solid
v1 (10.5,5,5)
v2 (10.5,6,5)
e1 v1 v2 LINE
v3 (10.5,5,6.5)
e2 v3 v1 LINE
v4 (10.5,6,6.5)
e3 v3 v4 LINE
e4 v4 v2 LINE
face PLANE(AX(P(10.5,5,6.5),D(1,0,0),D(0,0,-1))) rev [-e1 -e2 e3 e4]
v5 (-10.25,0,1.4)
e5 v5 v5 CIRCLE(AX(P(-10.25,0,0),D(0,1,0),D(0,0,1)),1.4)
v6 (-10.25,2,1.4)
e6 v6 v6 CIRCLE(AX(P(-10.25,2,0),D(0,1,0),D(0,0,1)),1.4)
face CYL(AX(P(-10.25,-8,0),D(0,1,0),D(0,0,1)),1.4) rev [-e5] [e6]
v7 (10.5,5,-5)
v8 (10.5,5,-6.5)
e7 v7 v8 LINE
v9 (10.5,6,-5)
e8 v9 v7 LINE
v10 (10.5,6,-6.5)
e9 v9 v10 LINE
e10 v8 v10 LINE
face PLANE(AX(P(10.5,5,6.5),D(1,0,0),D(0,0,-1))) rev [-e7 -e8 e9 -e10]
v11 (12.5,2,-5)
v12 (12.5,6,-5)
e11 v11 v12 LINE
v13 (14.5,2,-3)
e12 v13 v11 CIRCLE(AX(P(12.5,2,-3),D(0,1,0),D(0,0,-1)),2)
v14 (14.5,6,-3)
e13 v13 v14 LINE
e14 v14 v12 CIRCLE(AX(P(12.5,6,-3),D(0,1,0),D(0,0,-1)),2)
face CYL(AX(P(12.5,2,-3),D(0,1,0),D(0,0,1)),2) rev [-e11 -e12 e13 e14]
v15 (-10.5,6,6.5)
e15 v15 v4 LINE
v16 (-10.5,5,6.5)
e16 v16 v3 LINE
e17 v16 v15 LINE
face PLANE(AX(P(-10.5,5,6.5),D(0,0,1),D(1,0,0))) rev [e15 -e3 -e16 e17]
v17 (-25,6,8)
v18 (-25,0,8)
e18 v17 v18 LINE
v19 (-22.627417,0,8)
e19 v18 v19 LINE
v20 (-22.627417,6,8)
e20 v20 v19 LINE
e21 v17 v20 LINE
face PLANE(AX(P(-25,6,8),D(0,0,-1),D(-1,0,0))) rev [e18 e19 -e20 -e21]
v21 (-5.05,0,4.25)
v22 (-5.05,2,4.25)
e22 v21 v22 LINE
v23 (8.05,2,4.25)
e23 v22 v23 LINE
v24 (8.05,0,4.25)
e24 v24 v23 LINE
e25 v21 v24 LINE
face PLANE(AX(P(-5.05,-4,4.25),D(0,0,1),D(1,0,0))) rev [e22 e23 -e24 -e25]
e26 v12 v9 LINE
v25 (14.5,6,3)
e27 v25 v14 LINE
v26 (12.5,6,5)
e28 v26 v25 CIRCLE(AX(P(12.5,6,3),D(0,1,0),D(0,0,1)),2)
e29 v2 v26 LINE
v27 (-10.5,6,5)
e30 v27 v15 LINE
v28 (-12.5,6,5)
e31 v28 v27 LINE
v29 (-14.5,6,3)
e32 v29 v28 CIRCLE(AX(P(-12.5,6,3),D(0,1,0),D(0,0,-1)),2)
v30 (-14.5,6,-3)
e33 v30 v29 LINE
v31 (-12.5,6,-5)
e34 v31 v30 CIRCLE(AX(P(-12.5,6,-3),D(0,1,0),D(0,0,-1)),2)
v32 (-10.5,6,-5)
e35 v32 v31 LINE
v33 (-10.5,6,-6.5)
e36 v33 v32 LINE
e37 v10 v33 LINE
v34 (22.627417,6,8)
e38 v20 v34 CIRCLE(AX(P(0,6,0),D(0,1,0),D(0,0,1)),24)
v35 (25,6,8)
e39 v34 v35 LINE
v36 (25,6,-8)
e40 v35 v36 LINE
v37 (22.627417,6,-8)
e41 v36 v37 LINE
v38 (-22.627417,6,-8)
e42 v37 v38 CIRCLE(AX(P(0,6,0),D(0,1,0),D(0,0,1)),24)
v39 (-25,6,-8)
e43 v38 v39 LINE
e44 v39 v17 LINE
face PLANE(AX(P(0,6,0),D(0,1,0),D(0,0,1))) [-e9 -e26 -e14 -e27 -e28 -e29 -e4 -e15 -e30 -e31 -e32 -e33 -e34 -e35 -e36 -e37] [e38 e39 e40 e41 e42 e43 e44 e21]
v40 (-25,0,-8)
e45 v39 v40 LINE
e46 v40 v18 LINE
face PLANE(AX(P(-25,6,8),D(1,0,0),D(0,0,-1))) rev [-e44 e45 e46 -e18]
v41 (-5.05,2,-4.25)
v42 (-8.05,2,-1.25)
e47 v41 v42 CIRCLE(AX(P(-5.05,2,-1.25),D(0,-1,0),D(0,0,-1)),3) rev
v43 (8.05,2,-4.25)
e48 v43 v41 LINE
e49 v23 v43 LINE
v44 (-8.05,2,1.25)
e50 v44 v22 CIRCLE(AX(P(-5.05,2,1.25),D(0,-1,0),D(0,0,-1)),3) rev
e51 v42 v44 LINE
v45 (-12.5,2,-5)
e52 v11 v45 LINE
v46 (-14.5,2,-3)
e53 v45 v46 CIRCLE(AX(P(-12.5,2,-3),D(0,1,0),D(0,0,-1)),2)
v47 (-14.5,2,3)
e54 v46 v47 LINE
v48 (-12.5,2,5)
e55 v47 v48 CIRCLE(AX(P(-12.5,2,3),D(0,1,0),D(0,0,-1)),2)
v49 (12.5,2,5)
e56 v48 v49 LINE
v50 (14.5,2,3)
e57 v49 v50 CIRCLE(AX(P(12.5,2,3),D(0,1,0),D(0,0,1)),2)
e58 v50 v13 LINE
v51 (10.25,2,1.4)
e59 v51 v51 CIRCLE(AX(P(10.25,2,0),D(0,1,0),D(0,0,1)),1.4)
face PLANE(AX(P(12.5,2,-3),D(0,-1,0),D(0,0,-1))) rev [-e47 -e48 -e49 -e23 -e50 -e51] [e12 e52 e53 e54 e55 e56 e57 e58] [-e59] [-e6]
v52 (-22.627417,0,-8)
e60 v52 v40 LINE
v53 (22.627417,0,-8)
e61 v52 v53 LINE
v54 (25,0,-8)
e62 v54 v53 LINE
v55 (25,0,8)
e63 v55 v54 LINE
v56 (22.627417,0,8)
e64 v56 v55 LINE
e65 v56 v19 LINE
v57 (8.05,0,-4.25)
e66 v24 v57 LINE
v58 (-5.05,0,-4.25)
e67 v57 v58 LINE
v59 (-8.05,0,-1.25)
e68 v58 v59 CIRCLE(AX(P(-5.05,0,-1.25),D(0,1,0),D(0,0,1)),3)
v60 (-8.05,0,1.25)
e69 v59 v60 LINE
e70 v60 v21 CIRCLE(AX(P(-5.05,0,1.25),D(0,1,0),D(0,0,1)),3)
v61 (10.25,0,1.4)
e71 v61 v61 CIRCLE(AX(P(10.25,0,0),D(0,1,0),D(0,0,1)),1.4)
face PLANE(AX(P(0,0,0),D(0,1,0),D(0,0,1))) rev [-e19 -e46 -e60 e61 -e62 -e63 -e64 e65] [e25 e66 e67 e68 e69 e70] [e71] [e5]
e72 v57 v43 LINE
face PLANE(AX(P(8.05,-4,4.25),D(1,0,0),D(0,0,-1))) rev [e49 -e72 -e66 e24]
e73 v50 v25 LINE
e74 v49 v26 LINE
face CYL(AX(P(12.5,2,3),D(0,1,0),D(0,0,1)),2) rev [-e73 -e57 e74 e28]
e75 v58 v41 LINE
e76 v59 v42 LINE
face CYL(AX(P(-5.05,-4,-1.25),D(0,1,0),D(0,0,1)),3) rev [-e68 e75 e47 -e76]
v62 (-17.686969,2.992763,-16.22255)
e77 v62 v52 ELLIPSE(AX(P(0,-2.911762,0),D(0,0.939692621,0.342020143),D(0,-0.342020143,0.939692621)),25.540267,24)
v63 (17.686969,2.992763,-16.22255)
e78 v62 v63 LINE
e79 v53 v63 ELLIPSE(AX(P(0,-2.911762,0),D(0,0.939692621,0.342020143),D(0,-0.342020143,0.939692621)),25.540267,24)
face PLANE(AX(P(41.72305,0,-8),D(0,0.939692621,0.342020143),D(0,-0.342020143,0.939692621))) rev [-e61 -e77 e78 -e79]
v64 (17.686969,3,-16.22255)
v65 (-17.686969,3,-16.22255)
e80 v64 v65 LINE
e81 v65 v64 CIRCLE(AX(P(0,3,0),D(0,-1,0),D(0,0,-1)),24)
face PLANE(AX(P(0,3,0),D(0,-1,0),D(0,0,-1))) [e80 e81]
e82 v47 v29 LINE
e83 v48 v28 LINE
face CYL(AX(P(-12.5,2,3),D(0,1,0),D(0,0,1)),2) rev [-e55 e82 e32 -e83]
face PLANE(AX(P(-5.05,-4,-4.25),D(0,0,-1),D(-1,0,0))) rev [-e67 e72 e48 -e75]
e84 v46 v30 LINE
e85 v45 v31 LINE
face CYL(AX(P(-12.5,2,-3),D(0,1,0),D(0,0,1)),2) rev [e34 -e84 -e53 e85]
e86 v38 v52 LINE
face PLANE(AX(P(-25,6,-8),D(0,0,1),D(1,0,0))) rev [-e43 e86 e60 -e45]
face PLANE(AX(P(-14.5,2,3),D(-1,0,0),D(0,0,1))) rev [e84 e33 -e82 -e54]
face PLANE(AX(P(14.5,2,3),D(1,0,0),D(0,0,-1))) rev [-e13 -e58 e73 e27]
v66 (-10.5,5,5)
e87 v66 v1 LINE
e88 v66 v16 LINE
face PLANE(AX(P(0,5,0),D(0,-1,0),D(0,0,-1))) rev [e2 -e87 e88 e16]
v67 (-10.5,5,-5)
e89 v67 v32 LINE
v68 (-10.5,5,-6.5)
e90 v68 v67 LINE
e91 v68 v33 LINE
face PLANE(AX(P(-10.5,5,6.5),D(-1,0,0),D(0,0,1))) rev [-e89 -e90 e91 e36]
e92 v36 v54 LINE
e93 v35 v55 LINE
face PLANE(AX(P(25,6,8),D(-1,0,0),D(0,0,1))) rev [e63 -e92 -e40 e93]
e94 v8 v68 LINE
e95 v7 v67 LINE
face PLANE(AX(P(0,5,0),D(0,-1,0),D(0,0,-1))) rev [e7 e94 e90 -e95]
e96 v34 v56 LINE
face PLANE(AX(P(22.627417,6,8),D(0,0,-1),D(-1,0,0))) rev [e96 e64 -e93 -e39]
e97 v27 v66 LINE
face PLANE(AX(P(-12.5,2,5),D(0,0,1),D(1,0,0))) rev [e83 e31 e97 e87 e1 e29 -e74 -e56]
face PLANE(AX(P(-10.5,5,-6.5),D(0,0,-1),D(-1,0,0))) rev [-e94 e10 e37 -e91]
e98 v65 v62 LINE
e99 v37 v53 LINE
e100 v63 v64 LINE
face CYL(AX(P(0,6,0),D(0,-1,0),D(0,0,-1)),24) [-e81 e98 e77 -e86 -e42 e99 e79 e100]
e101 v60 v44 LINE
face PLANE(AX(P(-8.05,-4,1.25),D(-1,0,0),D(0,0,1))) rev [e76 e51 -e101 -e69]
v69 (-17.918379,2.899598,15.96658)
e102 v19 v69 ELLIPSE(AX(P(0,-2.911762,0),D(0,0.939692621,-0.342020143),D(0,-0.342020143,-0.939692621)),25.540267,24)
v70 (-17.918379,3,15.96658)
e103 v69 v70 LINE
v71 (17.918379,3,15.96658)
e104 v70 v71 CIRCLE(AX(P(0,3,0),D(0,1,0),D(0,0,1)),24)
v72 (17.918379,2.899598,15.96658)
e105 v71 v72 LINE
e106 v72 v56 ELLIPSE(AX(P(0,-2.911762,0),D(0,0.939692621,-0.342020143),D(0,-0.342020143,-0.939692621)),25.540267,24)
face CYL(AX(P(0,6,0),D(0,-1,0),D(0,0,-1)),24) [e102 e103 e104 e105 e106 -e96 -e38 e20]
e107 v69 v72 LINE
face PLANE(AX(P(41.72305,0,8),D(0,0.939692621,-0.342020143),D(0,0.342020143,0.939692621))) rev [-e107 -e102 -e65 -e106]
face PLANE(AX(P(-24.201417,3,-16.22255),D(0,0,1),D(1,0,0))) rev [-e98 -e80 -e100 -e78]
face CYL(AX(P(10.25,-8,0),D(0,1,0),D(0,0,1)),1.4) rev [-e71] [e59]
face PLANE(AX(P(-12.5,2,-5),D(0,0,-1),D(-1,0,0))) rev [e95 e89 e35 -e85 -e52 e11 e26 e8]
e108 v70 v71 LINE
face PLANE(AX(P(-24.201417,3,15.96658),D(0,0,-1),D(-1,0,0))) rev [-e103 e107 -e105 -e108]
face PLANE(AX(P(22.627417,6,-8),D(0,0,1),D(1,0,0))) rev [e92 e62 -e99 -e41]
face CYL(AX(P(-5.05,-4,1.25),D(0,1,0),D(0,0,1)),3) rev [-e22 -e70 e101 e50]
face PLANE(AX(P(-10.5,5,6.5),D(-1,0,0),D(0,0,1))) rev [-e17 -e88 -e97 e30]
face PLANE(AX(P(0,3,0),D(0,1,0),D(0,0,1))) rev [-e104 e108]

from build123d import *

# Parameters (mm, degrees)
BOSS_EXTRUDE1_DEPTH = 6
CUT_EXTRUDE1_DEPTH  = 10
CUT_EXTRUDE2_DEPTH  = 4
SKETCH4_W           = 21
SKETCH4_H           = 13
CUT_EXTRUDE3_DEPTH  = 1
SKETCH5_R           = 1.4
CUT_EXTRUDE4_DEPTH  = 10
CUT_EXTRUDE8_START  = -22.627416998
CUT_EXTRUDE8_DEPTH  = 45.254833996
SKETCH8_W           = 50.670468249
SKETCH8_H           = 10.499687698
SKETCH8_W_2         = 48.947034964
SKETCH8_H_2         = 10.380689976
CUT_EXTRUDE9_DEPTH  = 3


# Read off the part's stored shape, not the designer's step: Cut-Extrude8
with BuildPart() as part:
    # Sketch1 → Boss-Extrude1 (new body)
    with BuildSketch(Plane(origin=(0, 0, 0), x_dir=(1, 0, 0), z_dir=(0, 1, 0))):
        with BuildLine():
            Line((22.627416998, 8), (25, 8))
            Line((25, 8), (25, -8))
            Line((25, -8), (22.627416998, -8))
            ThreePointArc((22.627416998, -8), (0, -24), (-22.627416998, -8))
            Line((-22.627416998, -8), (-25, -8))
            Line((-25, -8), (-25, 8))
            Line((-25, 8), (-22.627416998, 8))
            ThreePointArc((-22.627416998, 8), (0, 24), (22.627416998, 8))
        make_face()
    extrude(amount=BOSS_EXTRUDE1_DEPTH)

    # Sketch2 → Cut-Extrude1 (cut)
    with BuildSketch(Plane(origin=(0, 6, 0), x_dir=(1, 0, 0), z_dir=(0, 1, 0))):
        with BuildLine():
            Line((-5.05, -4.25), (8.05, -4.25))
            Line((8.05, -4.25), (8.05, 4.25))
            Line((8.05, 4.25), (-5.05, 4.25))
            ThreePointArc((-5.05, 4.25), (-7.171320344, 3.371320344), (-8.05, 1.25))
            Line((-8.05, 1.25), (-8.05, -1.25))
            ThreePointArc((-8.05, -1.25), (-7.171320344, -3.371320344), (-5.05, -4.25))
        make_face()
    extrude(amount=-CUT_EXTRUDE1_DEPTH, mode=Mode.SUBTRACT)

    # Sketch3 → Cut-Extrude2 (cut)
    with BuildSketch(Plane(origin=(0, 6, 0), x_dir=(1, 0, 0), z_dir=(0, 1, 0))):
        with BuildLine():
            Line((-12.5, -5), (12.5, -5))
            ThreePointArc((12.5, -5), (13.914213562, -4.414213562), (14.5, -3))
            Line((14.5, -3), (14.5, 3))
            ThreePointArc((14.5, 3), (13.914213562, 4.414213562), (12.5, 5))
            Line((12.5, 5), (-12.5, 5))
            ThreePointArc((-12.5, 5), (-13.914213562, 4.414213562), (-14.5, 3))
            Line((-14.5, 3), (-14.5, -3))
            ThreePointArc((-14.5, -3), (-13.914213562, -4.414213562), (-12.5, -5))
        make_face()
    extrude(amount=-CUT_EXTRUDE2_DEPTH, mode=Mode.SUBTRACT)

    # Sketch4 → Cut-Extrude3 (cut)
    with BuildSketch(Plane(origin=(0, 6, 0), x_dir=(1, 0, 0), z_dir=(0, 1, 0))):
        Rectangle(SKETCH4_W, SKETCH4_H)
    extrude(amount=-CUT_EXTRUDE3_DEPTH, mode=Mode.SUBTRACT)

    # Sketch5 → Cut-Extrude4 (cut)
    with BuildSketch(Plane(origin=(0, 2, 0), x_dir=(1, 0, 0), z_dir=(0, 1, 0))):
        with Locations(Location((-10.25, 0, 0), (0, 0, 270))):
            Circle(SKETCH5_R)
        with Locations(Location((10.25, 0, 0), (0, 0, 270))):
            Circle(SKETCH5_R)
    extrude(amount=-CUT_EXTRUDE4_DEPTH, mode=Mode.SUBTRACT)

    # Cut-Extrude8 outline → Cut-Extrude8 (cut)
    with BuildSketch(Plane.YZ.offset(CUT_EXTRUDE8_START)):
        Polygon((0, -24.445099732), (0.162003054, -24), (2.992763401, -16.222549867), (0, -8), align=None)
        Polygon((0, 23.933160472), (0, 8), (2.899598075, 15.966580236), align=None)
    extrude(amount=CUT_EXTRUDE8_DEPTH, mode=Mode.SUBTRACT)

    # Sketch8 → Cut-Extrude9 (cut)
    with BuildSketch(Plane.XZ):
        with Locations((1.133817479, 21.216424085)):
            Rectangle(SKETCH8_W, SKETCH8_H)
        with Locations((0.272100837, -21.412894855)):
            Rectangle(SKETCH8_W_2, SKETCH8_H_2)
    extrude(amount=-CUT_EXTRUDE9_DEPTH, mode=Mode.SUBTRACT)


solid = part.part
